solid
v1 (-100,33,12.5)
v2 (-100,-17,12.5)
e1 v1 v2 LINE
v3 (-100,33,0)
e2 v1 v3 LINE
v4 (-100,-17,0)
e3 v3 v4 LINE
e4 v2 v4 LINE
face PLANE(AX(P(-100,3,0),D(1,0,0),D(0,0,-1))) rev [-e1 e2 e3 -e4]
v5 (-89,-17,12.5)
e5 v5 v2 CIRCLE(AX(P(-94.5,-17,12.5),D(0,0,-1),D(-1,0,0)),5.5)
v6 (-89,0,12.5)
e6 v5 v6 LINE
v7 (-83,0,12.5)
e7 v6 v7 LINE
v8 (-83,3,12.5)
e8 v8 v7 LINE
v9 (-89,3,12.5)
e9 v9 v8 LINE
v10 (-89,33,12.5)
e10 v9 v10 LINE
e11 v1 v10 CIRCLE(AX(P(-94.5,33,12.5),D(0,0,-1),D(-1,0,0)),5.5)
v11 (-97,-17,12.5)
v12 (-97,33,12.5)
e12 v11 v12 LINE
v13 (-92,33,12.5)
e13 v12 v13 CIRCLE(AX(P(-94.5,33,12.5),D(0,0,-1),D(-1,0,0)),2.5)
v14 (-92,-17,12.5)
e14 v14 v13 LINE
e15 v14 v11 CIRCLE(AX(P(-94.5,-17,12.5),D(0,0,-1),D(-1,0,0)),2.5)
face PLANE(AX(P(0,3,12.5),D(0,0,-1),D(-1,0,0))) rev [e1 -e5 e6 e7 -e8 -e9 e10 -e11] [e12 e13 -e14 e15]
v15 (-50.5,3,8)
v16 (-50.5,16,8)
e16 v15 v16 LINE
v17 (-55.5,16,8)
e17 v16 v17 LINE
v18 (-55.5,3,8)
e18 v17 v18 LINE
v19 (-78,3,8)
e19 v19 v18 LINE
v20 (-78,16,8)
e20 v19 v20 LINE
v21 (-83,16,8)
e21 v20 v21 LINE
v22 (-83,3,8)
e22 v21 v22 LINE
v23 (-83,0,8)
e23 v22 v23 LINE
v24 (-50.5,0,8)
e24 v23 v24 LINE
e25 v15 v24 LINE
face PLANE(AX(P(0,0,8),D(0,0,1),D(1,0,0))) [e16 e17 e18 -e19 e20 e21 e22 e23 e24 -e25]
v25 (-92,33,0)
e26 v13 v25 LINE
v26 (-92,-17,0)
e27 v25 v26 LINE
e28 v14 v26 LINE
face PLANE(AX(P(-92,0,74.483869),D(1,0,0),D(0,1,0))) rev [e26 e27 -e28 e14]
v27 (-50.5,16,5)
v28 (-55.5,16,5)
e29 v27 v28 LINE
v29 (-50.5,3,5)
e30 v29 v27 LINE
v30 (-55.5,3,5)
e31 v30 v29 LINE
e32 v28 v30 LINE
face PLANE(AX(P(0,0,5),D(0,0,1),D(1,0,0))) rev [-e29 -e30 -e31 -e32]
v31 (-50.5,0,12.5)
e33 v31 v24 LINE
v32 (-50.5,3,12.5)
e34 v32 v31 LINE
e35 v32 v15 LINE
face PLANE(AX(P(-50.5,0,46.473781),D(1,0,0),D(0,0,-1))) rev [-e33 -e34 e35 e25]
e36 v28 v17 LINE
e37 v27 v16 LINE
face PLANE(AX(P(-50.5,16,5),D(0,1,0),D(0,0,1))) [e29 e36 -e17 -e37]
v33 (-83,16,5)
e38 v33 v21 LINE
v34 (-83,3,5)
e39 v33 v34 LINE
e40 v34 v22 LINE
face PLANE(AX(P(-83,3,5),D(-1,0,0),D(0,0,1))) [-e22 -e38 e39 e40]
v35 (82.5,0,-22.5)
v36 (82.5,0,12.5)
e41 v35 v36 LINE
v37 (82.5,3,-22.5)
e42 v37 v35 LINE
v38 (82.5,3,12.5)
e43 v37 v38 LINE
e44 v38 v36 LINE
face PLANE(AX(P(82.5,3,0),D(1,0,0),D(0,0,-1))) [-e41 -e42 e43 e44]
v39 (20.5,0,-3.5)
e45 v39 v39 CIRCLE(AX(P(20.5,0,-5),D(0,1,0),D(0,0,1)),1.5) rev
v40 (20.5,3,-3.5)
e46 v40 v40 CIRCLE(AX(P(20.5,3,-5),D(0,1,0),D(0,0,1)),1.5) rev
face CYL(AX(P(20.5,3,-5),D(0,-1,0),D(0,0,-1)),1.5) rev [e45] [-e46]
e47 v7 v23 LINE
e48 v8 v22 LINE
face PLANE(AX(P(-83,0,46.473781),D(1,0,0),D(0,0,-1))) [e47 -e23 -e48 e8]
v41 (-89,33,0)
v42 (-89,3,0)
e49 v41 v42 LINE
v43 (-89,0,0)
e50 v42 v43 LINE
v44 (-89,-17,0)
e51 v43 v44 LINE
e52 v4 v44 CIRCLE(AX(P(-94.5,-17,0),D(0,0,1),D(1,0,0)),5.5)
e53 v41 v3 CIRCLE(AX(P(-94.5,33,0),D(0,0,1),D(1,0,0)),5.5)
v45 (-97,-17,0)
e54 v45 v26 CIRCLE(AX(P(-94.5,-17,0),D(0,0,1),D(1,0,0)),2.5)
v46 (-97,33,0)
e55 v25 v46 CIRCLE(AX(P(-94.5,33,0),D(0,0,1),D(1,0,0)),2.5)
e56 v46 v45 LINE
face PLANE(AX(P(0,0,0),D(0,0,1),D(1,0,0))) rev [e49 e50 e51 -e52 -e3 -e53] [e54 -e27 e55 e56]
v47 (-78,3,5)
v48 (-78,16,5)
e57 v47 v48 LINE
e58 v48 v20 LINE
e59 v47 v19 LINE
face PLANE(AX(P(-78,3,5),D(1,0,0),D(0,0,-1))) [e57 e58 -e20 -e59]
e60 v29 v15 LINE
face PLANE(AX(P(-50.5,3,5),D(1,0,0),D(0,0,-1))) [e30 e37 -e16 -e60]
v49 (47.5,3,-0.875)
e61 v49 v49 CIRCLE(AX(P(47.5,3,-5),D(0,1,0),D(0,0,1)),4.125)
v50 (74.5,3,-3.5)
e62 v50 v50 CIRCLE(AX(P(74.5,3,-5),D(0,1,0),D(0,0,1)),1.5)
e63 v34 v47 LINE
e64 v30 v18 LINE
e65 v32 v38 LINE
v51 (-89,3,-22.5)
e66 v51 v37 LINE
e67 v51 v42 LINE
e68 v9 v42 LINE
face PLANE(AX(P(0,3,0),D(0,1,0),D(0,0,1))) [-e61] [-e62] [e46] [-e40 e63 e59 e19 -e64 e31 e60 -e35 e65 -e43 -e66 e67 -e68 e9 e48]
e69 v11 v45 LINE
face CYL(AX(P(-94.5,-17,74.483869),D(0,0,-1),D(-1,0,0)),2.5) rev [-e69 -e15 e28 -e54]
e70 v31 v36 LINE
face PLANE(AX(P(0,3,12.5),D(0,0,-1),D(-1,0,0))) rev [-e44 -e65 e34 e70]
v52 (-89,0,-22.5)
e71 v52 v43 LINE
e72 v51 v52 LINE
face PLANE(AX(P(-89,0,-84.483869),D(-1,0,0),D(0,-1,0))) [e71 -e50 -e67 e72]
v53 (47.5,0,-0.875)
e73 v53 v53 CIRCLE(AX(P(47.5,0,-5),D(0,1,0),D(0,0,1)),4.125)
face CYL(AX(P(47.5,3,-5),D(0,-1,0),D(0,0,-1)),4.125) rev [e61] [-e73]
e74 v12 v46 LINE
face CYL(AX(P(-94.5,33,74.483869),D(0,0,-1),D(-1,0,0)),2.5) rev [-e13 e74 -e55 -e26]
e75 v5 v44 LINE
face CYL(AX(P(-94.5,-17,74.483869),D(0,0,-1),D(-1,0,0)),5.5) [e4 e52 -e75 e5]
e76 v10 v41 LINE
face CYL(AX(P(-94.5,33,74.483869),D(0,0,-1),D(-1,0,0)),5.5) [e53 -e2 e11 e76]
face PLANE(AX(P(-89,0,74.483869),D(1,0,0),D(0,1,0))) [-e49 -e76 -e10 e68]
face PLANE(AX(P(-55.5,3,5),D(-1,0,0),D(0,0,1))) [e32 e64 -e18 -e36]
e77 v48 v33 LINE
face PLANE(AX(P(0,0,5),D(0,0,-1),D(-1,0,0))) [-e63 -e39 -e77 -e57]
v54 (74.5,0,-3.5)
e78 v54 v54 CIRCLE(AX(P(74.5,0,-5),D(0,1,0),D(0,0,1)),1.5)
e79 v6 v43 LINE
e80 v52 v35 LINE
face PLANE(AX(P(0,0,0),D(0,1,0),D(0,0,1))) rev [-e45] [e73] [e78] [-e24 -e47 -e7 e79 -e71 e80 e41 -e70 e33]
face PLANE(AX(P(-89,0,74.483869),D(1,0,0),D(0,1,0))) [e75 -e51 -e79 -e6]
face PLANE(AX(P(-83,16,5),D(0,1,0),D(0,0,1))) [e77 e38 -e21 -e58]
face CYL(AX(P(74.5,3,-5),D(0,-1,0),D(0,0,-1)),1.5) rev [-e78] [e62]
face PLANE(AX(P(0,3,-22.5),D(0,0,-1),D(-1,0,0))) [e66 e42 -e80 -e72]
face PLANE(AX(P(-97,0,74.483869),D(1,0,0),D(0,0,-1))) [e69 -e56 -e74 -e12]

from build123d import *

# Parameters (mm, degrees)
SKETCH1_W              = 70
SKETCH1_H              = 12
SKETCH1_R              = 1.5
SKETCH1_R_2            = 4.125
BOSS_EXTRUDE1_DEPTH    = 3
BOSS_EXTRUDE2_DEPTH    = 12.5
CUT_EXTRUDE1_START     = -22.5
CUT_EXTRUDE1_OUTLINE_W = 5
CUT_EXTRUDE1_OUTLINE_H = 3
CUT_EXTRUDE1_DEPTH     = 35
CUT_EXTRUDE2_START     = -22.5
CUT_EXTRUDE2_DEPTH     = 22.5
CUT_EXTRUDE3_START     = 8
SKETCH2_5_W            = 32.5
SKETCH2_5_H            = 9.897866997
CUT_EXTRUDE3_DEPTH     = 4.5
SKETCH4_W              = 5
SKETCH4_H              = 13
BOSS_EXTRUDE3_DEPTH    = 3


# Read off the part's stored shape, not the designer's step: Cut-Extrude1
with BuildPart() as part:
    # Sketch1 → Boss-Extrude1 (new body)
    # profile 1 of 2: a face of its own
    with BuildSketch(Plane(origin=(0, 0, 0), x_dir=(1, 0, 0), z_dir=(0, 1, 0))):
        Polygon((82.5, 22.5), (-100, 22.5), (-100, -12.5), (82.5, -12.5), (82.5, -1), (12.5, -1), (12.5, 11), (82.5, 11), align=None)
    # profile 2 of 2: a face of its own
    with BuildSketch(Plane(origin=(0, 0, 0), x_dir=(1, 0, 0), z_dir=(0, 1, 0))):
        with Locations((47.5, 5)):
            Rectangle(SKETCH1_W, SKETCH1_H)
        with Locations(Location((20.5, 5, 0), (0, 0, 270))):
            Circle(SKETCH1_R, mode=Mode.SUBTRACT)
        with Locations(Location((47.5, 5, 0), (0, 0, 270))):
            Circle(SKETCH1_R_2, mode=Mode.SUBTRACT)
        with Locations(Location((74.5, 5, 0), (0, 0, 270))):
            Circle(SKETCH1_R, mode=Mode.SUBTRACT)
    extrude(amount=BOSS_EXTRUDE1_DEPTH)

    # Sketch2 → Boss-Extrude2 (add)
    with BuildSketch(Plane.XY):
        with BuildLine():
            Line((-89, 33), (-89, -17))
            ThreePointArc((-89, -17), (-94.5, -22.5), (-100, -17))
            Line((-100, -17), (-100, 33))
            ThreePointArc((-100, 33), (-94.5, 38.5), (-89, 33))
        make_face()
        with BuildLine():
            ThreePointArc((-97, -17), (-94.5, -19.5), (-92, -17))
            Line((-92, -17), (-92, 33))
            ThreePointArc((-92, 33), (-94.5, 35.5), (-97, 33))
            Line((-97, 33), (-97, -17))
        make_face(mode=Mode.SUBTRACT)
    extrude(amount=BOSS_EXTRUDE2_DEPTH)

    # Cut-Extrude1 outline → Cut-Extrude1 (cut)
    with BuildSketch(Plane.XY.offset(CUT_EXTRUDE1_START)):
        with Locations((-94.5, 1.5)):
            Rectangle(CUT_EXTRUDE1_OUTLINE_W, CUT_EXTRUDE1_OUTLINE_H)
    extrude(amount=CUT_EXTRUDE1_DEPTH, mode=Mode.SUBTRACT)

    # Sketch2<3> → Cut-Extrude2 (cut)
    with BuildSketch(Plane.XY.offset(CUT_EXTRUDE2_START)):
        with BuildLine():
            Line((-89, 33), (-89, -17))
            ThreePointArc((-89, -17), (-94.5, -22.5), (-100, -17))
            Line((-100, -17), (-100, 33))
            ThreePointArc((-100, 33), (-94.5, 38.5), (-89, 33))
        make_face()
        with BuildLine():
            ThreePointArc((-97, -17), (-94.5, -19.5), (-92, -17))
            Line((-92, -17), (-92, 33))
            ThreePointArc((-92, 33), (-94.5, 35.5), (-97, 33))
            Line((-97, 33), (-97, -17))
        make_face(mode=Mode.SUBTRACT)
    extrude(amount=CUT_EXTRUDE2_DEPTH, mode=Mode.SUBTRACT)

    # Sketch2<5> → Cut-Extrude3 (cut)
    with BuildSketch(Plane.XY.offset(CUT_EXTRUDE3_START)):
        with Locations((-66.75, 1.550857661)):
            Rectangle(SKETCH2_5_W, SKETCH2_5_H)
    extrude(amount=CUT_EXTRUDE3_DEPTH, mode=Mode.SUBTRACT)

    # Sketch4 → Boss-Extrude3 (add)
    with BuildSketch(Plane.XY.offset(8)):
        with Locations((-80.5, 9.5)):
            Rectangle(SKETCH4_W, SKETCH4_H)
        with Locations((-53, 9.5)):
            Rectangle(SKETCH4_W, SKETCH4_H)
    extrude(amount=-BOSS_EXTRUDE3_DEPTH)


solid = part.part
